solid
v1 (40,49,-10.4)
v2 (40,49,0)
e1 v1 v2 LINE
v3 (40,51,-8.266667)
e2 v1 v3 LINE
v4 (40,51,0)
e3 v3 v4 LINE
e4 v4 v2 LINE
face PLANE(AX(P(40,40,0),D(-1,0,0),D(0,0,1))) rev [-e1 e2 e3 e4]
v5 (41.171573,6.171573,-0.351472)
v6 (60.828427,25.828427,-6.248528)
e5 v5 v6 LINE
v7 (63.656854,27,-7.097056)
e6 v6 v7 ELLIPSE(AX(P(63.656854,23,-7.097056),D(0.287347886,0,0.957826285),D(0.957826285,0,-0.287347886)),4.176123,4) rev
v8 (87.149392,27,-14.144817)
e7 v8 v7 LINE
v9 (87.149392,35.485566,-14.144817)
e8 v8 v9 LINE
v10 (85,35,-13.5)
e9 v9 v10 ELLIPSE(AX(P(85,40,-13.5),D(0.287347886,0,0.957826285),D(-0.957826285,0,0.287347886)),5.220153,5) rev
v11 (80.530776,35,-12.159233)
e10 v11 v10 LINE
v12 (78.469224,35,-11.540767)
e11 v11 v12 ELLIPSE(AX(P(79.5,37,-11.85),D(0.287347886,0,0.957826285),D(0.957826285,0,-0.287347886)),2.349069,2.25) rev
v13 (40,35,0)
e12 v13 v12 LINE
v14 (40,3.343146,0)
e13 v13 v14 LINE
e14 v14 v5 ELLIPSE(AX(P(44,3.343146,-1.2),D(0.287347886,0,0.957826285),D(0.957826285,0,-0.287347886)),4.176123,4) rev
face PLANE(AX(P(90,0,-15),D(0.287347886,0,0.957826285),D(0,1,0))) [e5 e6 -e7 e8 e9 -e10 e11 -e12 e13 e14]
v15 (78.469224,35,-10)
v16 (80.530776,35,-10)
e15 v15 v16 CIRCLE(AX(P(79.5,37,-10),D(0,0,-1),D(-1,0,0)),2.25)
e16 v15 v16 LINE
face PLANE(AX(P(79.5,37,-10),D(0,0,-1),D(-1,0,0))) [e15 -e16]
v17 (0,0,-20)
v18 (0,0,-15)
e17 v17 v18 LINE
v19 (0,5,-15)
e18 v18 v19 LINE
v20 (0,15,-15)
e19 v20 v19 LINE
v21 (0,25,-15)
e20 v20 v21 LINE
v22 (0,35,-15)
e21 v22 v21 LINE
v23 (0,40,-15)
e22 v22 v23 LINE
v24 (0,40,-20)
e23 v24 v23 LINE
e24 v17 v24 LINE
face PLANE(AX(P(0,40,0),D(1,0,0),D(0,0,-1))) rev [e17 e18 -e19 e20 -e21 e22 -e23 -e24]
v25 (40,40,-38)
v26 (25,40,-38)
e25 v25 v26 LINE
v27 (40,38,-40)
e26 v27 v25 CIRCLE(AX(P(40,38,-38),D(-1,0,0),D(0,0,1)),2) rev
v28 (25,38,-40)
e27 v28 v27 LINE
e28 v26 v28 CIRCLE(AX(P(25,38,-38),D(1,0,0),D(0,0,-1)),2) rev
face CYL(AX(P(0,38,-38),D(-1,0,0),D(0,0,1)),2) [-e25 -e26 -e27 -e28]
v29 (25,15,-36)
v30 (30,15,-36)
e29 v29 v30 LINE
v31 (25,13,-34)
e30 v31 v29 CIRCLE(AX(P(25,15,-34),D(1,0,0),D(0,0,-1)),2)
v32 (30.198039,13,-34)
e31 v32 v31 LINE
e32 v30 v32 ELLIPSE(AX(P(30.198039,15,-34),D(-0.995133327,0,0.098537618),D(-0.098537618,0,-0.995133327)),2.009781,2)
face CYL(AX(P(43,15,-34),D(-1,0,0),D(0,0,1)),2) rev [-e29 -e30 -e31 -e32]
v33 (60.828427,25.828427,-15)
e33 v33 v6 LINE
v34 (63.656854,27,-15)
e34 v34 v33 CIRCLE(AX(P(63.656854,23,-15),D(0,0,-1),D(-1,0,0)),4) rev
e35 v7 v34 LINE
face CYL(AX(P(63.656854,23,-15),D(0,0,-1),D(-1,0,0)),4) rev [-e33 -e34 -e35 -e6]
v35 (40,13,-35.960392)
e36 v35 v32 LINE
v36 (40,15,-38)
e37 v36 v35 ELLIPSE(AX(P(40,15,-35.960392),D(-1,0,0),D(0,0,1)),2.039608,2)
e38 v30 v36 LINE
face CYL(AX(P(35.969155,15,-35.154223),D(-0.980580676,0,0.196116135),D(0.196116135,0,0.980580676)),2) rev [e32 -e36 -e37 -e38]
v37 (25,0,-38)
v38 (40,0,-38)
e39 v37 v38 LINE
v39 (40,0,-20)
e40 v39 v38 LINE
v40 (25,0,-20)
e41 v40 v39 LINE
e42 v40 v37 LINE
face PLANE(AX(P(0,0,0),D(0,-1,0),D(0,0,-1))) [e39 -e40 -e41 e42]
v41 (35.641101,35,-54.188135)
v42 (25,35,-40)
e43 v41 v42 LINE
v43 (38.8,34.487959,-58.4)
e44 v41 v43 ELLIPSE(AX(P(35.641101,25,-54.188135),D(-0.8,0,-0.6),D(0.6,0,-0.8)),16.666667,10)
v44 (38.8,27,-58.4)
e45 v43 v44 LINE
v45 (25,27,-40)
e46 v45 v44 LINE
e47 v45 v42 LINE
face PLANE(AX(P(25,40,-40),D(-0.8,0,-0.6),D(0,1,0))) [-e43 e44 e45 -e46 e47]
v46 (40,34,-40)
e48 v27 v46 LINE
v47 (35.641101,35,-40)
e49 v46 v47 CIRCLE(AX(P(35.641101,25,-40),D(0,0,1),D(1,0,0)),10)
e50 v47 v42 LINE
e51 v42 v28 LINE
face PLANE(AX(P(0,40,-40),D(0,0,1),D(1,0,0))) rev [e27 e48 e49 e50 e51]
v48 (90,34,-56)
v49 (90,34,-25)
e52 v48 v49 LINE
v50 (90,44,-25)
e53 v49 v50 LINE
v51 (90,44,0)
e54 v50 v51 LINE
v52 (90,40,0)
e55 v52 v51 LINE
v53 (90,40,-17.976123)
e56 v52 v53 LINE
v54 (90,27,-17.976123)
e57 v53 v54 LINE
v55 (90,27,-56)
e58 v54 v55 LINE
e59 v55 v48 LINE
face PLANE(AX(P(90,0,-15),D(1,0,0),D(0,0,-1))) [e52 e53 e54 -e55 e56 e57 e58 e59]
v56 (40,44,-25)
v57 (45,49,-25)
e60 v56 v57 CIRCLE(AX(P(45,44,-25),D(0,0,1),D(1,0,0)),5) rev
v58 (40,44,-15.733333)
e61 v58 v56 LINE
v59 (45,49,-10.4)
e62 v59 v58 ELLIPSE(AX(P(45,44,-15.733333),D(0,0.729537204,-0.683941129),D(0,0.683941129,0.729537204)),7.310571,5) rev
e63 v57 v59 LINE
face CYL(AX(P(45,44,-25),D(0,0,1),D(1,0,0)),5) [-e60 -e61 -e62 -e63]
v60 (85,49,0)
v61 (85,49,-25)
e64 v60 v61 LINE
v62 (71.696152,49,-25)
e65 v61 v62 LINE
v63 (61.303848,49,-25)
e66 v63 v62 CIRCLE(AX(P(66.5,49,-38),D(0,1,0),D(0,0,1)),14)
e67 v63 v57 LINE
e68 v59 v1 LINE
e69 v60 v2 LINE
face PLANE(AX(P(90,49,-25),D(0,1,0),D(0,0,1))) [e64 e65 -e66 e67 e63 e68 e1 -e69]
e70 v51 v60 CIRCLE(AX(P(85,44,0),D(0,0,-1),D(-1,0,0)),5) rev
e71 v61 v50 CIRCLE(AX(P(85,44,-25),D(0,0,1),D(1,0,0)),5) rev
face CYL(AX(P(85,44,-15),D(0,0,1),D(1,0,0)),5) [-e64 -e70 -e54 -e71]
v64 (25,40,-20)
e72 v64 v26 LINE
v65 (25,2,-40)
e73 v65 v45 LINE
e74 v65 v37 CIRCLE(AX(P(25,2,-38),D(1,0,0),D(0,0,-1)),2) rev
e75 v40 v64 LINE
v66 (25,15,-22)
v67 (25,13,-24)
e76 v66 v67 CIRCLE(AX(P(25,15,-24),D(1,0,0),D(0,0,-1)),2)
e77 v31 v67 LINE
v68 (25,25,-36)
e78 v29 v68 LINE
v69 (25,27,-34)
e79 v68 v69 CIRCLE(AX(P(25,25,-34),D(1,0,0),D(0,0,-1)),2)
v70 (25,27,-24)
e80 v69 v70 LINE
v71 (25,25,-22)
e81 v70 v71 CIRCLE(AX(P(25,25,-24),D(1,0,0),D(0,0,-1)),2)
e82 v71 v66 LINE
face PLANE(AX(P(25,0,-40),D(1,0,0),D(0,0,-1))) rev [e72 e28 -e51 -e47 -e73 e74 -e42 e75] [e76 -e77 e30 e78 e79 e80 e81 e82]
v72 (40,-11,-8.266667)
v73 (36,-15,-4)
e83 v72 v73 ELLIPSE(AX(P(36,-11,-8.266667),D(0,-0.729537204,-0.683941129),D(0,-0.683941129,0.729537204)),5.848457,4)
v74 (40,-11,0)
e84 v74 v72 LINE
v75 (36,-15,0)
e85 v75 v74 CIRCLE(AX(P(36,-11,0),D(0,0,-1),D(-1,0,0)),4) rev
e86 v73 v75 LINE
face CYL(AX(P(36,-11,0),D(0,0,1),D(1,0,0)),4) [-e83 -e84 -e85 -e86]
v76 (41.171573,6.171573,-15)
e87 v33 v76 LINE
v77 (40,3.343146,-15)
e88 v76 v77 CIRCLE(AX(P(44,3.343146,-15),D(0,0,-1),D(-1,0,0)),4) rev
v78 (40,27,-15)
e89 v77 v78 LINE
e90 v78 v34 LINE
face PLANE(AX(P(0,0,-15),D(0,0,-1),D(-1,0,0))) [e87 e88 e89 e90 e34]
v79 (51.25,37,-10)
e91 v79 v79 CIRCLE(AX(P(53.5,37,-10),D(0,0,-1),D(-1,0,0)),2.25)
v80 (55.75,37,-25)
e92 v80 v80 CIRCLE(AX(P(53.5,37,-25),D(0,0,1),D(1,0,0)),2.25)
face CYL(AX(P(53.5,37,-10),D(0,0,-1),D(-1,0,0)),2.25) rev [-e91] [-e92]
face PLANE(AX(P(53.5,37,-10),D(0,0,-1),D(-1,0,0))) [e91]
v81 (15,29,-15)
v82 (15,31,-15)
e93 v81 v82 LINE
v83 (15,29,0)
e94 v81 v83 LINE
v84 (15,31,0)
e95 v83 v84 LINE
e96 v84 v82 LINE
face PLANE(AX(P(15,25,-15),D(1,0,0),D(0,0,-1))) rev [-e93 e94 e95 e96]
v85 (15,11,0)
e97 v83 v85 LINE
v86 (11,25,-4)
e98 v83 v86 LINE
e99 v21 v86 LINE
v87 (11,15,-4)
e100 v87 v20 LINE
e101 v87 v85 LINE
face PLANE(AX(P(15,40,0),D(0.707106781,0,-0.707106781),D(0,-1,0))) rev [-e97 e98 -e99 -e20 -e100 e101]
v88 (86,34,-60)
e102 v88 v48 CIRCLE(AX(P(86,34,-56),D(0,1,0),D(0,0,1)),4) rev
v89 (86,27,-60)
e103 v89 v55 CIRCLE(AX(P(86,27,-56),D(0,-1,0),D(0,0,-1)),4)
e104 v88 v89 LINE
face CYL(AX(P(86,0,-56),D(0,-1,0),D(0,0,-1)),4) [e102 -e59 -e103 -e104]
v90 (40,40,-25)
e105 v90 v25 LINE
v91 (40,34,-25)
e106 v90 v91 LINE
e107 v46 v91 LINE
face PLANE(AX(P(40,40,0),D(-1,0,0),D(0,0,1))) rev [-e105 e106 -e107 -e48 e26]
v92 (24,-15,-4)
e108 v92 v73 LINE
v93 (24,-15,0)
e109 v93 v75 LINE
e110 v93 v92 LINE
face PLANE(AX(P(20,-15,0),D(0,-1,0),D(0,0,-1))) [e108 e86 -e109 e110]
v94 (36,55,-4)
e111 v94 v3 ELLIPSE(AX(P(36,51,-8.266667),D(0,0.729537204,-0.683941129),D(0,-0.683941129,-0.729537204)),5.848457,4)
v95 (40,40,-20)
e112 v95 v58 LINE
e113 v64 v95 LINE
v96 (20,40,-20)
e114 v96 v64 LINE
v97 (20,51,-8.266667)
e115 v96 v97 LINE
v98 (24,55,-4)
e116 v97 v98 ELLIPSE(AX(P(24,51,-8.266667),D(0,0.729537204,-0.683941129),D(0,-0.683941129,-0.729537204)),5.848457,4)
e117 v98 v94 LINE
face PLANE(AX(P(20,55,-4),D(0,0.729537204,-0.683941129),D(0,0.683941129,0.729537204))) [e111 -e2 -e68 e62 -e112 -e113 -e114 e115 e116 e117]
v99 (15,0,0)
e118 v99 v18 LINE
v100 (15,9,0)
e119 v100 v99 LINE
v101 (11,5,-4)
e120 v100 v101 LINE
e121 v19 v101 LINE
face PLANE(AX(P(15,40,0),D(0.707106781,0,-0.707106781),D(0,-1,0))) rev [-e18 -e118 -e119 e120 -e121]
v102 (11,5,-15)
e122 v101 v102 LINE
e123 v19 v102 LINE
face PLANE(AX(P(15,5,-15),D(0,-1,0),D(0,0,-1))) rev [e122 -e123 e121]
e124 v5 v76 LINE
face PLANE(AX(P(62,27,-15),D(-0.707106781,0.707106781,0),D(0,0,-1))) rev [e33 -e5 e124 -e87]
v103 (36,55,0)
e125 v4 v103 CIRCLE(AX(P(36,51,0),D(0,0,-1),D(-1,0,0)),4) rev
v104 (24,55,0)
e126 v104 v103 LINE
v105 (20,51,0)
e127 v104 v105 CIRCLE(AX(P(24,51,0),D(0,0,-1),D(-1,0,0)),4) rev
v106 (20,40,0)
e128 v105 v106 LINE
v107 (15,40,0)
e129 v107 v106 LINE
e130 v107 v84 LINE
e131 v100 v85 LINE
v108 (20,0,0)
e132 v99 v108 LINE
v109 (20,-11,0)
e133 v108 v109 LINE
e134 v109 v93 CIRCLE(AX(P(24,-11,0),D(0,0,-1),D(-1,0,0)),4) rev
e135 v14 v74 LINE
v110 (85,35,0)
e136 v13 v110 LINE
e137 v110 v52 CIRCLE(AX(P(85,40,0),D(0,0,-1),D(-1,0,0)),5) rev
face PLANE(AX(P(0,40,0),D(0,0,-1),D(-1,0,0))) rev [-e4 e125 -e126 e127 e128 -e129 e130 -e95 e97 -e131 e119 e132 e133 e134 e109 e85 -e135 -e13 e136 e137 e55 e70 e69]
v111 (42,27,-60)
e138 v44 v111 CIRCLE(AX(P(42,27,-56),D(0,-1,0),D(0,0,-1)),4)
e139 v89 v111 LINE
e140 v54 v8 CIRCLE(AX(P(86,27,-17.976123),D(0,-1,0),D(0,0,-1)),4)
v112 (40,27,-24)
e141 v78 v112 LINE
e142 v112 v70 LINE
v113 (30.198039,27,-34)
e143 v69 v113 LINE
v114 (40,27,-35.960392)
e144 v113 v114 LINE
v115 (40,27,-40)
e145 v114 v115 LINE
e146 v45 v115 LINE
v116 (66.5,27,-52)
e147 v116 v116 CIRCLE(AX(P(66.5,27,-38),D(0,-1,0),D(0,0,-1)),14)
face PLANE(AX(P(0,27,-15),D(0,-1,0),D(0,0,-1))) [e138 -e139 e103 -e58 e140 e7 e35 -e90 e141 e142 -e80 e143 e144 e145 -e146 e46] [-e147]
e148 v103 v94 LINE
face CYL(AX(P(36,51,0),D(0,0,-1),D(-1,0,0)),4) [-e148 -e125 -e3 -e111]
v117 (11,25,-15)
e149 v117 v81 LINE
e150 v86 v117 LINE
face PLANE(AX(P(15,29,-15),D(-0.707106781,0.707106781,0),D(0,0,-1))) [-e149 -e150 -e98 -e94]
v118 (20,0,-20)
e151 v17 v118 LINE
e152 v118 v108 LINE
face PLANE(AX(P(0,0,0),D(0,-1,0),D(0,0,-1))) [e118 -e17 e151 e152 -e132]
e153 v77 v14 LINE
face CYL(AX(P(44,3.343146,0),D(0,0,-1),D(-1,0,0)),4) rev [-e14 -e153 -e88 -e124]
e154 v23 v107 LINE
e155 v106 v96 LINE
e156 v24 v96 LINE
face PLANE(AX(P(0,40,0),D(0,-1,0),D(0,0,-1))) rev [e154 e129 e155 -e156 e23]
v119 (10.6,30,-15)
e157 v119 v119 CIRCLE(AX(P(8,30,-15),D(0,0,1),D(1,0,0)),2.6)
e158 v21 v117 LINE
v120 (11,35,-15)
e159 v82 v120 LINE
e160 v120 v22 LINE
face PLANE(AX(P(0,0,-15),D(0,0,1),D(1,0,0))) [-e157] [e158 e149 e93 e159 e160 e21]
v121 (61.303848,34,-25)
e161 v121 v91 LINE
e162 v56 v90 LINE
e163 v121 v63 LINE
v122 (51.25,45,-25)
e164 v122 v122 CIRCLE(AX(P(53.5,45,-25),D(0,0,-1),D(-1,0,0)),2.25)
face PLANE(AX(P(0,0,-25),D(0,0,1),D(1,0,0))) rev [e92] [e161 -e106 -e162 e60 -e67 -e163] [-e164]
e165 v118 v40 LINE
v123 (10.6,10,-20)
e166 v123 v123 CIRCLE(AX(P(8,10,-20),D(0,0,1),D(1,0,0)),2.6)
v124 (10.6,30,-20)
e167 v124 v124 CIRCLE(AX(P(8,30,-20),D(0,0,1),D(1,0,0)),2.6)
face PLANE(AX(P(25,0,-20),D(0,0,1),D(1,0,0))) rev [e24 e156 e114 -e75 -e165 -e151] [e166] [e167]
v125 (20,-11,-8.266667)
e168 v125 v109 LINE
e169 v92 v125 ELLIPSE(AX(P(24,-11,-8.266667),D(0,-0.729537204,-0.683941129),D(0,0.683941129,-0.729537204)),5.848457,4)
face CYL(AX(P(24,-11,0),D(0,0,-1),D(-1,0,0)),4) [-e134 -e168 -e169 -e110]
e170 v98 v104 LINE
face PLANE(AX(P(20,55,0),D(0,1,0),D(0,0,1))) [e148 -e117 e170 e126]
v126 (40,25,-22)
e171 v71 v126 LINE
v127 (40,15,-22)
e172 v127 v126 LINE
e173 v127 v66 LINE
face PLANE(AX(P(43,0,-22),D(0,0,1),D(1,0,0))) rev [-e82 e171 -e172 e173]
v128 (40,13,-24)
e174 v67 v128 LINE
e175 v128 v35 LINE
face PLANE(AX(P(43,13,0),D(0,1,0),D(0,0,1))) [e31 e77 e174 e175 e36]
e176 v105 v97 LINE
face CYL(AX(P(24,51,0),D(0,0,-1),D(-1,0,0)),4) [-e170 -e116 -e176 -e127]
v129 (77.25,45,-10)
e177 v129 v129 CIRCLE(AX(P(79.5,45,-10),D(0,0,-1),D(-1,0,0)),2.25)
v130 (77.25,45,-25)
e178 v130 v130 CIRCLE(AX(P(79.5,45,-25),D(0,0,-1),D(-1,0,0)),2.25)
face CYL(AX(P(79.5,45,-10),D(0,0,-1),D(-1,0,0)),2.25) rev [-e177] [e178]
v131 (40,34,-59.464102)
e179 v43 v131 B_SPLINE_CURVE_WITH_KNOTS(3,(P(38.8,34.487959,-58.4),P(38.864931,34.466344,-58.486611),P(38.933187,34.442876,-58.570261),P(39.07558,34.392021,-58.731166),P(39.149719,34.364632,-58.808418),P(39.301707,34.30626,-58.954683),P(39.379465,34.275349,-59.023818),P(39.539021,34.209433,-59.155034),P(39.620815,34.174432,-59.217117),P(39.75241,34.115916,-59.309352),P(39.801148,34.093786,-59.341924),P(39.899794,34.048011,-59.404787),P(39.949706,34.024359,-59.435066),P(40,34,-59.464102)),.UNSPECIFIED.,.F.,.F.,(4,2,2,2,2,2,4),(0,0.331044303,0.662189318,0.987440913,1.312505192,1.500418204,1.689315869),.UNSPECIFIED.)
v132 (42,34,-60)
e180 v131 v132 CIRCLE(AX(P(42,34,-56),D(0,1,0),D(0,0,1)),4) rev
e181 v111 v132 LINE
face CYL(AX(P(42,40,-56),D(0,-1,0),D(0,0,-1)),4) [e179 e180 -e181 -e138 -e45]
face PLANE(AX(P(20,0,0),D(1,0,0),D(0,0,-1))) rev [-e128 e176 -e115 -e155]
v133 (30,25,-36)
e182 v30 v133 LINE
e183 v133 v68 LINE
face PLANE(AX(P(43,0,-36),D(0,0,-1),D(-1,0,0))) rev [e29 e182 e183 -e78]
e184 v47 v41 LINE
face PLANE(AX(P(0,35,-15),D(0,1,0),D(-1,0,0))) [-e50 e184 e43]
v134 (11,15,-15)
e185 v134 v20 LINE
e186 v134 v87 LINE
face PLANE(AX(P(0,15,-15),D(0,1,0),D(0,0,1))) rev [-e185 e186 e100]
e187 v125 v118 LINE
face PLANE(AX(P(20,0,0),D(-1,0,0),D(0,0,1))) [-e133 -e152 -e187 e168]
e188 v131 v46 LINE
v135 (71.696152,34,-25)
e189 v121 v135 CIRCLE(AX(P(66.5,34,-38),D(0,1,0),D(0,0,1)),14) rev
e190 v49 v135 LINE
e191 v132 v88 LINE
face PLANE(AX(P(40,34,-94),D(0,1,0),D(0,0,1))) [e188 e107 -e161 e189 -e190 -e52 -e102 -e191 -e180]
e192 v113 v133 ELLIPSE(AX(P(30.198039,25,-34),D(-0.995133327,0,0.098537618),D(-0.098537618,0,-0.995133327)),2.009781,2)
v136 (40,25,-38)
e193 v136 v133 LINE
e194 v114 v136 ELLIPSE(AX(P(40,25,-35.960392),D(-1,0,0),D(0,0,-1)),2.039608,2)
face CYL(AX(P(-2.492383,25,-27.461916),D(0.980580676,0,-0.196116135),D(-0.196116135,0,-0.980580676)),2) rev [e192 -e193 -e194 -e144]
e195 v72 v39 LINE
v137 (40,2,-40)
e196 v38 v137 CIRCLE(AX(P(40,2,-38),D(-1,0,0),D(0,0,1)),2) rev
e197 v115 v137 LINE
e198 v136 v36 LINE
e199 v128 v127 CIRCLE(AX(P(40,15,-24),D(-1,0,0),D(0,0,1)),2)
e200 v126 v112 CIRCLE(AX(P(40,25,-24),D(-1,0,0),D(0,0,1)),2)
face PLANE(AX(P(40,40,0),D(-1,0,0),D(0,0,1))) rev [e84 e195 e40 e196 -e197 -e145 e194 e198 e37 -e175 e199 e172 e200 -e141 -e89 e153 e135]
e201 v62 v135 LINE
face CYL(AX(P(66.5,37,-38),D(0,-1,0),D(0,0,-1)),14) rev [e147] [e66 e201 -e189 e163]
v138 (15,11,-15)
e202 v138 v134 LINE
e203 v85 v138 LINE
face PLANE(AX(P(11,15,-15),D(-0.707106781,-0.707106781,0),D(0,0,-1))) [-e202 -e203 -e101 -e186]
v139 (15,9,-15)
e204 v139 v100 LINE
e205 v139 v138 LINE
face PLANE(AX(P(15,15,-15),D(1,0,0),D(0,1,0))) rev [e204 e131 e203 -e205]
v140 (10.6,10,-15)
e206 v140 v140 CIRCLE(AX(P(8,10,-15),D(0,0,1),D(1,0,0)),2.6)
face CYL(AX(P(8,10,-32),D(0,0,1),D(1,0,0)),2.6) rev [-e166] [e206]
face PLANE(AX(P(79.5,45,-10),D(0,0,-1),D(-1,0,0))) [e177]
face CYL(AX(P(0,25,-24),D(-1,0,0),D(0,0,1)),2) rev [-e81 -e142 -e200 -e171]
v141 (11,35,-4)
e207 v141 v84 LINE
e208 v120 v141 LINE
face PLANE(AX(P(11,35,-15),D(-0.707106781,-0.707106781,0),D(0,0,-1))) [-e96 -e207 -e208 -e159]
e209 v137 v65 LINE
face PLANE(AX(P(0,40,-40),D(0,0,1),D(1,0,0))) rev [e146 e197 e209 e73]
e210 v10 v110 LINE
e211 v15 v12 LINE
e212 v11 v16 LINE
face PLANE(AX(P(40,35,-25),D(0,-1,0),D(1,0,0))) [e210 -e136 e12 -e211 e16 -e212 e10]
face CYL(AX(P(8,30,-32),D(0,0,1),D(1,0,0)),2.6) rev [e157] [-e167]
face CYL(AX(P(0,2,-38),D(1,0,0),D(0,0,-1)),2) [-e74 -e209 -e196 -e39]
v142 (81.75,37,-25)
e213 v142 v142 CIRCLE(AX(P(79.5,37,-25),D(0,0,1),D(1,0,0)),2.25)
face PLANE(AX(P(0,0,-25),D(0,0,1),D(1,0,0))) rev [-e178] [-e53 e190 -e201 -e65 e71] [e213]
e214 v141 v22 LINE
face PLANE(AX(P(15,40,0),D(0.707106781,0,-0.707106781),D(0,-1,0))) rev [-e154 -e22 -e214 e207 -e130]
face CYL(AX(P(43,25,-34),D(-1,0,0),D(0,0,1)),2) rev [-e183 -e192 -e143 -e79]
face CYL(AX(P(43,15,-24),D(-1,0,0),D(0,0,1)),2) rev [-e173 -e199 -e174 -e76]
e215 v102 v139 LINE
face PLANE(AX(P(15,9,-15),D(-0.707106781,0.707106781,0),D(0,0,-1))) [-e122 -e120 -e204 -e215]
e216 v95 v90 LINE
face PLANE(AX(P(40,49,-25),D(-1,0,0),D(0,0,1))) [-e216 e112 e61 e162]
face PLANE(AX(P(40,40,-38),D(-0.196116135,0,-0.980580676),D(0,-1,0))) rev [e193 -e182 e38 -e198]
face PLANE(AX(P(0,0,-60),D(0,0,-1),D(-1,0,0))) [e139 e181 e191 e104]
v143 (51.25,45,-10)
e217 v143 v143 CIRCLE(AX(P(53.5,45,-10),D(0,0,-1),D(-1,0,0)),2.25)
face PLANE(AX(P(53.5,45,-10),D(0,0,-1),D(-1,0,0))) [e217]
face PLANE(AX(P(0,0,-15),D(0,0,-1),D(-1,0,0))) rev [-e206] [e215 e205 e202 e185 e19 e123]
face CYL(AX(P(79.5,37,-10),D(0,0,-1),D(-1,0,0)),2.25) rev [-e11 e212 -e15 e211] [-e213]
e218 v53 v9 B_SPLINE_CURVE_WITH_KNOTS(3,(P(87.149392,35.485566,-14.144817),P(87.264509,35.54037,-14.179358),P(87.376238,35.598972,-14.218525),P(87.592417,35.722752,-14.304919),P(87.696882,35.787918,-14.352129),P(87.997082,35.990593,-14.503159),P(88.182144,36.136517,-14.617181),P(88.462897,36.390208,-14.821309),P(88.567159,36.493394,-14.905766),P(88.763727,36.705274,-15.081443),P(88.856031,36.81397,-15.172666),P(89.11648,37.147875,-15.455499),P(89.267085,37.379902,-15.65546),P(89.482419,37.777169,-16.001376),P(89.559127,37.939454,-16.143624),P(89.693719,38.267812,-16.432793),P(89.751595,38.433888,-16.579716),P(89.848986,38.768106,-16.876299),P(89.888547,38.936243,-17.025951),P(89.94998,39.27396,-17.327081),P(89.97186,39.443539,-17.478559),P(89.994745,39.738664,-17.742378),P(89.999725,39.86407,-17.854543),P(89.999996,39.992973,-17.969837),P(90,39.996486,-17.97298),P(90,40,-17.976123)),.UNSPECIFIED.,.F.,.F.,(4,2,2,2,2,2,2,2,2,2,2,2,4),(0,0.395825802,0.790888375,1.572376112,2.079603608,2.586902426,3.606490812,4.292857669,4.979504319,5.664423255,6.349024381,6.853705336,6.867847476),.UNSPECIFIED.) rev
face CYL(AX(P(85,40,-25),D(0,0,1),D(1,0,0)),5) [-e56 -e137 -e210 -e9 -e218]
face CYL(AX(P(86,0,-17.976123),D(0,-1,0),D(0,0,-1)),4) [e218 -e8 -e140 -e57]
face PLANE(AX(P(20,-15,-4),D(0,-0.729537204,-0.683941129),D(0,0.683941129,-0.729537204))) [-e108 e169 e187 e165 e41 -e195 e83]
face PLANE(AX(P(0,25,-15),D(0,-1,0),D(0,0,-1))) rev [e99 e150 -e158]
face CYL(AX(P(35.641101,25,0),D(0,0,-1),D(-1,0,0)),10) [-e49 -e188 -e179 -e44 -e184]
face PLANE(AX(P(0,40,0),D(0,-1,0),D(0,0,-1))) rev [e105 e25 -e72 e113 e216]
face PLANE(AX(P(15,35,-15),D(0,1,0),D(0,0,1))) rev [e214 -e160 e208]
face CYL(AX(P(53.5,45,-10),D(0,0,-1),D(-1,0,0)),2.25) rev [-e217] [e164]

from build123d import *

# Parameters (mm, degrees)
SKETCH1_W                = 40
SKETCH1_H                = 40
BOSS_EXTRUDE1_DEPTH      = 40
SKETCH2_W                = 25
SKETCH2_H                = 20
CUT_EXTRUDE1_DEPTH       = 40
CHAMFER1_SIZE            = 15
CUT_EXTRUDE2_DEPTH       = 15
CHAMFER2_SIZE            = 4
SKETCH4_R                = 2.6
CUT_EXTRUDE3_DEPTH       = 17
BOSS_EXTRUDE3_DEPTH      = 20
FILLET3_R                = 4
BOSS_EXTRUDE2_DEPTH      = 20
BOSS_EXTRUDE2_DEPTH_BACK = 25
SKETCH5_W                = 50
SKETCH5_H                = 8
SKETCH10_R               = 14
CUT_EXTRUDE4_DEPTH       = 10
CHAMFER3_SIZE            = 15
CHAMFER3_SIZE_2          = 20
CHAMFER4_SIZE2           = 50
CHAMFER4_SIZE            = 15
FILLET5_START            = 26
FILLET5_DEPTH            = 10
FILLET6_R                = 2
CHAMFER5_SIZE            = 22
SKETCH11_W               = 27.237482008
SKETCH11_H               = 25
CUT_EXTRUDE5_DEPTH       = 25
FILLET7_R                = 4
SKETCH16_W               = 14
SKETCH16_H               = 14
CUT_EXTRUDE6_DEPTH       = 43
CHAMFER6_SIZE            = 10
CHAMFER6_SIZE2           = 2
FILLET9_R                = 2
SKETCH18_W               = 50
SKETCH18_H               = 14
BOSS_EXTRUDE4_DEPTH      = 25
SKETCH19_R               = 2.25
CUT_EXTRUDE7_DEPTH       = 15
FILLET10_R               = 5
SKETCH20_W               = 50
SKETCH20_H               = 1
CUT_EXTRUDE8_DEPTH       = 69
FILLET11_R               = 10
SKETCH21_R               = 14
CUT_EXTRUDE9_DEPTH       = 69


with BuildPart() as part:
    # Sketch1 → Boss-Extrude1 (new body)
    with BuildSketch(Plane(origin=(0, 0, 0), x_dir=(1, 0, 0), z_dir=(0, 1, 0))):
        with Locations((20, 20)):
            Rectangle(SKETCH1_W, SKETCH1_H)
    extrude(amount=BOSS_EXTRUDE1_DEPTH)

    # Sketch2 → Cut-Extrude1 (cut)
    with BuildSketch(Plane(origin=(0, 40, 0), x_dir=(1, 0, 0), z_dir=(0, 1, 0))):
        with Locations((12.5, 30)):
            Rectangle(SKETCH2_W, SKETCH2_H)
    extrude(amount=-CUT_EXTRUDE1_DEPTH, mode=Mode.SUBTRACT)

    # Chamfer1
    chamfer1_edges = [part.edges().sort_by_distance(p)[0] for p in [
        (0, 20, 0),
    ]]
    chamfer(chamfer1_edges, length=CHAMFER1_SIZE)

    # Sketch3 → Cut-Extrude2 (cut)
    with BuildSketch(Plane.XY):
        Polygon((0, 10), (0, 15), (15, 15), (15, 5), (0, 5), align=None)
        Polygon((0, 30), (0, 25), (15, 25), (15, 35), (0, 35), align=None)
    extrude(amount=-CUT_EXTRUDE2_DEPTH, mode=Mode.SUBTRACT)

    # Chamfer2
    chamfer2_edges = [part.edges().sort_by_distance(p)[0] for p in [
        (15, 35, -7.5),
        (15, 25, -7.5),
        (15, 15, -7.5),
        (15, 5, -7.5),
    ]]
    chamfer(chamfer2_edges, length=CHAMFER2_SIZE)

    # Sketch4 → Cut-Extrude3 (cut)
    with BuildSketch(Plane.XY.offset(-15)):
        with Locations((8, 30)):
            Circle(SKETCH4_R)
        with Locations((8, 10)):
            Circle(SKETCH4_R)
    extrude(amount=-CUT_EXTRUDE3_DEPTH, mode=Mode.SUBTRACT)

    # Sketch9 → Boss-Extrude3 (add)
    with BuildSketch(Plane(origin=(40, 0, 0), x_dir=(0, 0, -1), z_dir=(1, 0, 0))):
        Polygon((0, 40), (0, 55), (4, 55), (20, 40), align=None)
        Polygon((0, 0), (0, -15), (4, -15), (20, 0), align=None)
    extrude(amount=-BOSS_EXTRUDE3_DEPTH)

    # Fillet3
    fillet3_edges = [part.edges().sort_by_distance(p)[0] for p in [
        (20, 55, -2),
        (40, 55, -2),
        (20, -15, -2),
        (40, -15, -2),
    ]]
    fillet(fillet3_edges, radius=FILLET3_R)

    # Sketch5 → Boss-Extrude2 (add, two sides: drawn at the far end of the back side and taken through both)
    with BuildSketch(Plane(origin=(0, 0, -40), x_dir=(-1, 0, 0), z_dir=(0, 0, -1)).offset(-BOSS_EXTRUDE2_DEPTH_BACK)):
        with Locations((-65, 31)):
            Rectangle(SKETCH5_W, SKETCH5_H)
    extrude(amount=BOSS_EXTRUDE2_DEPTH + BOSS_EXTRUDE2_DEPTH_BACK)

    # Sketch10 → Cut-Extrude4 (cut)
    with BuildSketch(Plane(origin=(0, 27, 0), x_dir=(-1, 0, 0), z_dir=(0, -1, 0))):
        with Locations(Location((-66.5, 38, 0), (0, 0, 90))):
            Circle(SKETCH10_R)
    extrude(amount=-CUT_EXTRUDE4_DEPTH, mode=Mode.SUBTRACT)

    # Chamfer3
    # the kernel refuses this chamfer: 20, 15 mm, written as the material it adds along each edge
    with BuildSketch(Plane(origin=(40, 27, -40), x_dir=(-1, 0, 0), z_dir=(0, 1, 0))) as chamfer3_piece_1:
        Polygon((CHAMFER3_SIZE, 0), (0, -CHAMFER3_SIZE_2), (0, 0), align=None)
    extrude(amount=8)

    # Chamfer4
    chamfer4_edges = [part.edges().sort_by_distance(p)[0] for p in [
        (40, 31, -15),
    ]]
    chamfer4_side = [part.faces().sort_by_distance(p)[0] for p in [
        (40, 31, -14.7),
    ]]
    chamfer(chamfer4_edges, length=CHAMFER4_SIZE - 0.0001, length2=CHAMFER4_SIZE2 - 0.0001, reference=chamfer4_side[0])  # a hair under: the kernel refuses the full size

    # Fillet5: read off the stored shape, not the designer's step
    # Fillet5 outline → Fillet5 (cut)
    with BuildSketch(Plane(origin=(0, 0, 0), x_dir=(1, 0, 0), z_dir=(0, 1, 0)).offset(FILLET5_START)):
        with BuildLine():
            Line((90, 15), (90, 17.976122604))
            ThreePointArc((90, 17.976122604), (89.209171713, 15.588400485), (87.149391542, 14.144817463))
            Line((87.149391542, 14.144817463), (90, 15))
        make_face()
        with BuildLine():
            ThreePointArc((38.8, 58.4), (40.211145618, 59.577708764), (42, 60))
            Line((42, 60), (40, 60))
            Line((40, 60), (38.8, 58.4))
        make_face()
        with BuildLine():
            ThreePointArc((86, 60), (88.828427125, 58.828427125), (90, 56))
            Line((90, 56), (90, 60))
            Line((90, 60), (86, 60))
        make_face()
    extrude(amount=FILLET5_DEPTH, mode=Mode.SUBTRACT)

    # Fillet6
    fillet6_edges = [part.edges().sort_by_distance(p)[0] for p in [
        (32.5, 40, -40),
        (32.5, 0, -40),
    ]]
    fillet(fillet6_edges, radius=FILLET6_R)

    # Chamfer5
    # the kernel refuses this chamfer: 22 mm, written as the material it adds along each edge
    with BuildSketch(Plane(origin=(40, 27, 56.576925735), x_dir=(1, 0, 0), z_dir=(0, 0, -1))) as chamfer5_piece_1_section:
        Polygon((CHAMFER5_SIZE, 0), (0, CHAMFER5_SIZE), (0, 0), align=None)
    chamfer5_piece_1 = extrude(amount=96.576925735, mode=Mode.PRIVATE)
    chamfer5_piece_1 = split(chamfer5_piece_1, bisect_by=Plane(origin=(24.428402209, 27, 4.671357537), z_dir=(-0.2873466553275782, 0, -0.9578266542919204)), keep=Keep.TOP, mode=Mode.PRIVATE)
    chamfer5_piece_1 = chamfer5_piece_1 - Plane(origin=(66.5, 27, -38), x_dir=(0, 0, -1), z_dir=(0, -1, 0)) * Cylinder(14, 282, mode=Mode.PRIVATE)
    chamfer5_piece_1 = split(chamfer5_piece_1, bisect_by=Plane(origin=(40, 27, 0), z_dir=(0, 0, -1)), keep=Keep.TOP, mode=Mode.PRIVATE)
    add(chamfer5_piece_1)

    # Sketch11 → Cut-Extrude5 (cut)
    with BuildSketch(Plane(origin=(0, 0, -40), x_dir=(-1, 0, 0), z_dir=(0, 0, -1))):
        with Locations((-53.618741004, 14.5)):
            Rectangle(SKETCH11_W, SKETCH11_H)
    extrude(amount=-CUT_EXTRUDE5_DEPTH, mode=Mode.SUBTRACT)

    # Fillet7
    fillet7_edges = [part.edges().sort_by_distance(p)[0] for p in [
        (62, 27, -10.8000346),
        (40, 5, -7.50005),
    ]]
    fillet(fillet7_edges, radius=FILLET7_R)

    # Sketch16 → Cut-Extrude6 (cut)
    with BuildSketch(Plane.ZY):
        with Locations((-29, 20)):
            Rectangle(SKETCH16_W, SKETCH16_H)
    extrude(amount=-CUT_EXTRUDE6_DEPTH, mode=Mode.SUBTRACT)

    # Chamfer6
    chamfer6_edges = [part.edges().sort_by_distance(p)[0] for p in [
        (40, 20, -36),
    ]]
    chamfer6_side = [part.faces().sort_by_distance(p)[0] for p in [
        (32.5, 20, -36),
    ]]
    chamfer(chamfer6_edges, length=CHAMFER6_SIZE, length2=CHAMFER6_SIZE2, reference=chamfer6_side[0])

    # Fillet9
    fillet9_edges = [part.edges().sort_by_distance(p)[0] for p in [
        (32.5, 13, -22),
        (32.5, 27, -22),
        (27.5, 27, -36),
        (27.5, 13, -36),
        (35, 13, -37),
        (35, 27, -37),
    ]]
    fillet(fillet9_edges, radius=FILLET9_R)

    # Sketch18 → Boss-Extrude4 (add)
    with BuildSketch(Plane.XY):
        with Locations((65, 42)):
            Rectangle(SKETCH18_W, SKETCH18_H)
    extrude(amount=-BOSS_EXTRUDE4_DEPTH)

    # Sketch19 → Cut-Extrude7 (cut)
    with BuildSketch(Plane(origin=(0, 0, -25), x_dir=(-1, 0, 0), z_dir=(0, 0, -1))):
        with Locations((-79.5, 45)):
            Circle(SKETCH19_R)
        with Locations(Location((-79.5, 37, 0), (0, 0, 297.266044451))):
            Circle(SKETCH19_R)
        with Locations((-53.5, 45)):
            Circle(SKETCH19_R)
        with Locations((-53.5, 37)):
            Circle(SKETCH19_R)
    extrude(amount=-CUT_EXTRUDE7_DEPTH, mode=Mode.SUBTRACT)

    # Fillet10
    fillet10_edges = [part.edges().sort_by_distance(p)[0] for p in [
        (90, 35, -8.988061302),
        (90, 49, -12.5),
        (40, 49, -17.7),
    ]]
    fillet(fillet10_edges, radius=FILLET10_R)

    # Sketch20 → Cut-Extrude8 (cut)
    with BuildSketch(Plane(origin=(0, 0, -25), x_dir=(-1, 0, 0), z_dir=(0, 0, -1))):
        with Locations((-65, 34.5)):
            Rectangle(SKETCH20_W, SKETCH20_H)
    extrude(amount=CUT_EXTRUDE8_DEPTH, mode=Mode.SUBTRACT)

    # Fillet11
    # the kernel refuses this fillet: 10 mm, written as the material it takes off along each edge
    with BuildSketch(Plane(origin=(40, 35, -40), x_dir=(-1, 0, 0), z_dir=(0, 0, -1))) as fillet11_piece_1:
        with BuildLine():
            CenterArc((4.358898944, -10), FILLET11_R, 90, 25.841932763)
            Line((0, -1), (0, 0))
            Line((0, 0), (4.358898944, 0))
        make_face()
    extrude(amount=30.361348974, mode=Mode.SUBTRACT)

    # Sketch21 → Cut-Extrude9 (cut)
    with BuildSketch(Plane.XZ.offset(-35)):
        with Locations(Location((66.5, -38, 0), (0, 0, 270))):
            Circle(SKETCH21_R)
    extrude(amount=-CUT_EXTRUDE9_DEPTH, mode=Mode.SUBTRACT)


solid = part.part
